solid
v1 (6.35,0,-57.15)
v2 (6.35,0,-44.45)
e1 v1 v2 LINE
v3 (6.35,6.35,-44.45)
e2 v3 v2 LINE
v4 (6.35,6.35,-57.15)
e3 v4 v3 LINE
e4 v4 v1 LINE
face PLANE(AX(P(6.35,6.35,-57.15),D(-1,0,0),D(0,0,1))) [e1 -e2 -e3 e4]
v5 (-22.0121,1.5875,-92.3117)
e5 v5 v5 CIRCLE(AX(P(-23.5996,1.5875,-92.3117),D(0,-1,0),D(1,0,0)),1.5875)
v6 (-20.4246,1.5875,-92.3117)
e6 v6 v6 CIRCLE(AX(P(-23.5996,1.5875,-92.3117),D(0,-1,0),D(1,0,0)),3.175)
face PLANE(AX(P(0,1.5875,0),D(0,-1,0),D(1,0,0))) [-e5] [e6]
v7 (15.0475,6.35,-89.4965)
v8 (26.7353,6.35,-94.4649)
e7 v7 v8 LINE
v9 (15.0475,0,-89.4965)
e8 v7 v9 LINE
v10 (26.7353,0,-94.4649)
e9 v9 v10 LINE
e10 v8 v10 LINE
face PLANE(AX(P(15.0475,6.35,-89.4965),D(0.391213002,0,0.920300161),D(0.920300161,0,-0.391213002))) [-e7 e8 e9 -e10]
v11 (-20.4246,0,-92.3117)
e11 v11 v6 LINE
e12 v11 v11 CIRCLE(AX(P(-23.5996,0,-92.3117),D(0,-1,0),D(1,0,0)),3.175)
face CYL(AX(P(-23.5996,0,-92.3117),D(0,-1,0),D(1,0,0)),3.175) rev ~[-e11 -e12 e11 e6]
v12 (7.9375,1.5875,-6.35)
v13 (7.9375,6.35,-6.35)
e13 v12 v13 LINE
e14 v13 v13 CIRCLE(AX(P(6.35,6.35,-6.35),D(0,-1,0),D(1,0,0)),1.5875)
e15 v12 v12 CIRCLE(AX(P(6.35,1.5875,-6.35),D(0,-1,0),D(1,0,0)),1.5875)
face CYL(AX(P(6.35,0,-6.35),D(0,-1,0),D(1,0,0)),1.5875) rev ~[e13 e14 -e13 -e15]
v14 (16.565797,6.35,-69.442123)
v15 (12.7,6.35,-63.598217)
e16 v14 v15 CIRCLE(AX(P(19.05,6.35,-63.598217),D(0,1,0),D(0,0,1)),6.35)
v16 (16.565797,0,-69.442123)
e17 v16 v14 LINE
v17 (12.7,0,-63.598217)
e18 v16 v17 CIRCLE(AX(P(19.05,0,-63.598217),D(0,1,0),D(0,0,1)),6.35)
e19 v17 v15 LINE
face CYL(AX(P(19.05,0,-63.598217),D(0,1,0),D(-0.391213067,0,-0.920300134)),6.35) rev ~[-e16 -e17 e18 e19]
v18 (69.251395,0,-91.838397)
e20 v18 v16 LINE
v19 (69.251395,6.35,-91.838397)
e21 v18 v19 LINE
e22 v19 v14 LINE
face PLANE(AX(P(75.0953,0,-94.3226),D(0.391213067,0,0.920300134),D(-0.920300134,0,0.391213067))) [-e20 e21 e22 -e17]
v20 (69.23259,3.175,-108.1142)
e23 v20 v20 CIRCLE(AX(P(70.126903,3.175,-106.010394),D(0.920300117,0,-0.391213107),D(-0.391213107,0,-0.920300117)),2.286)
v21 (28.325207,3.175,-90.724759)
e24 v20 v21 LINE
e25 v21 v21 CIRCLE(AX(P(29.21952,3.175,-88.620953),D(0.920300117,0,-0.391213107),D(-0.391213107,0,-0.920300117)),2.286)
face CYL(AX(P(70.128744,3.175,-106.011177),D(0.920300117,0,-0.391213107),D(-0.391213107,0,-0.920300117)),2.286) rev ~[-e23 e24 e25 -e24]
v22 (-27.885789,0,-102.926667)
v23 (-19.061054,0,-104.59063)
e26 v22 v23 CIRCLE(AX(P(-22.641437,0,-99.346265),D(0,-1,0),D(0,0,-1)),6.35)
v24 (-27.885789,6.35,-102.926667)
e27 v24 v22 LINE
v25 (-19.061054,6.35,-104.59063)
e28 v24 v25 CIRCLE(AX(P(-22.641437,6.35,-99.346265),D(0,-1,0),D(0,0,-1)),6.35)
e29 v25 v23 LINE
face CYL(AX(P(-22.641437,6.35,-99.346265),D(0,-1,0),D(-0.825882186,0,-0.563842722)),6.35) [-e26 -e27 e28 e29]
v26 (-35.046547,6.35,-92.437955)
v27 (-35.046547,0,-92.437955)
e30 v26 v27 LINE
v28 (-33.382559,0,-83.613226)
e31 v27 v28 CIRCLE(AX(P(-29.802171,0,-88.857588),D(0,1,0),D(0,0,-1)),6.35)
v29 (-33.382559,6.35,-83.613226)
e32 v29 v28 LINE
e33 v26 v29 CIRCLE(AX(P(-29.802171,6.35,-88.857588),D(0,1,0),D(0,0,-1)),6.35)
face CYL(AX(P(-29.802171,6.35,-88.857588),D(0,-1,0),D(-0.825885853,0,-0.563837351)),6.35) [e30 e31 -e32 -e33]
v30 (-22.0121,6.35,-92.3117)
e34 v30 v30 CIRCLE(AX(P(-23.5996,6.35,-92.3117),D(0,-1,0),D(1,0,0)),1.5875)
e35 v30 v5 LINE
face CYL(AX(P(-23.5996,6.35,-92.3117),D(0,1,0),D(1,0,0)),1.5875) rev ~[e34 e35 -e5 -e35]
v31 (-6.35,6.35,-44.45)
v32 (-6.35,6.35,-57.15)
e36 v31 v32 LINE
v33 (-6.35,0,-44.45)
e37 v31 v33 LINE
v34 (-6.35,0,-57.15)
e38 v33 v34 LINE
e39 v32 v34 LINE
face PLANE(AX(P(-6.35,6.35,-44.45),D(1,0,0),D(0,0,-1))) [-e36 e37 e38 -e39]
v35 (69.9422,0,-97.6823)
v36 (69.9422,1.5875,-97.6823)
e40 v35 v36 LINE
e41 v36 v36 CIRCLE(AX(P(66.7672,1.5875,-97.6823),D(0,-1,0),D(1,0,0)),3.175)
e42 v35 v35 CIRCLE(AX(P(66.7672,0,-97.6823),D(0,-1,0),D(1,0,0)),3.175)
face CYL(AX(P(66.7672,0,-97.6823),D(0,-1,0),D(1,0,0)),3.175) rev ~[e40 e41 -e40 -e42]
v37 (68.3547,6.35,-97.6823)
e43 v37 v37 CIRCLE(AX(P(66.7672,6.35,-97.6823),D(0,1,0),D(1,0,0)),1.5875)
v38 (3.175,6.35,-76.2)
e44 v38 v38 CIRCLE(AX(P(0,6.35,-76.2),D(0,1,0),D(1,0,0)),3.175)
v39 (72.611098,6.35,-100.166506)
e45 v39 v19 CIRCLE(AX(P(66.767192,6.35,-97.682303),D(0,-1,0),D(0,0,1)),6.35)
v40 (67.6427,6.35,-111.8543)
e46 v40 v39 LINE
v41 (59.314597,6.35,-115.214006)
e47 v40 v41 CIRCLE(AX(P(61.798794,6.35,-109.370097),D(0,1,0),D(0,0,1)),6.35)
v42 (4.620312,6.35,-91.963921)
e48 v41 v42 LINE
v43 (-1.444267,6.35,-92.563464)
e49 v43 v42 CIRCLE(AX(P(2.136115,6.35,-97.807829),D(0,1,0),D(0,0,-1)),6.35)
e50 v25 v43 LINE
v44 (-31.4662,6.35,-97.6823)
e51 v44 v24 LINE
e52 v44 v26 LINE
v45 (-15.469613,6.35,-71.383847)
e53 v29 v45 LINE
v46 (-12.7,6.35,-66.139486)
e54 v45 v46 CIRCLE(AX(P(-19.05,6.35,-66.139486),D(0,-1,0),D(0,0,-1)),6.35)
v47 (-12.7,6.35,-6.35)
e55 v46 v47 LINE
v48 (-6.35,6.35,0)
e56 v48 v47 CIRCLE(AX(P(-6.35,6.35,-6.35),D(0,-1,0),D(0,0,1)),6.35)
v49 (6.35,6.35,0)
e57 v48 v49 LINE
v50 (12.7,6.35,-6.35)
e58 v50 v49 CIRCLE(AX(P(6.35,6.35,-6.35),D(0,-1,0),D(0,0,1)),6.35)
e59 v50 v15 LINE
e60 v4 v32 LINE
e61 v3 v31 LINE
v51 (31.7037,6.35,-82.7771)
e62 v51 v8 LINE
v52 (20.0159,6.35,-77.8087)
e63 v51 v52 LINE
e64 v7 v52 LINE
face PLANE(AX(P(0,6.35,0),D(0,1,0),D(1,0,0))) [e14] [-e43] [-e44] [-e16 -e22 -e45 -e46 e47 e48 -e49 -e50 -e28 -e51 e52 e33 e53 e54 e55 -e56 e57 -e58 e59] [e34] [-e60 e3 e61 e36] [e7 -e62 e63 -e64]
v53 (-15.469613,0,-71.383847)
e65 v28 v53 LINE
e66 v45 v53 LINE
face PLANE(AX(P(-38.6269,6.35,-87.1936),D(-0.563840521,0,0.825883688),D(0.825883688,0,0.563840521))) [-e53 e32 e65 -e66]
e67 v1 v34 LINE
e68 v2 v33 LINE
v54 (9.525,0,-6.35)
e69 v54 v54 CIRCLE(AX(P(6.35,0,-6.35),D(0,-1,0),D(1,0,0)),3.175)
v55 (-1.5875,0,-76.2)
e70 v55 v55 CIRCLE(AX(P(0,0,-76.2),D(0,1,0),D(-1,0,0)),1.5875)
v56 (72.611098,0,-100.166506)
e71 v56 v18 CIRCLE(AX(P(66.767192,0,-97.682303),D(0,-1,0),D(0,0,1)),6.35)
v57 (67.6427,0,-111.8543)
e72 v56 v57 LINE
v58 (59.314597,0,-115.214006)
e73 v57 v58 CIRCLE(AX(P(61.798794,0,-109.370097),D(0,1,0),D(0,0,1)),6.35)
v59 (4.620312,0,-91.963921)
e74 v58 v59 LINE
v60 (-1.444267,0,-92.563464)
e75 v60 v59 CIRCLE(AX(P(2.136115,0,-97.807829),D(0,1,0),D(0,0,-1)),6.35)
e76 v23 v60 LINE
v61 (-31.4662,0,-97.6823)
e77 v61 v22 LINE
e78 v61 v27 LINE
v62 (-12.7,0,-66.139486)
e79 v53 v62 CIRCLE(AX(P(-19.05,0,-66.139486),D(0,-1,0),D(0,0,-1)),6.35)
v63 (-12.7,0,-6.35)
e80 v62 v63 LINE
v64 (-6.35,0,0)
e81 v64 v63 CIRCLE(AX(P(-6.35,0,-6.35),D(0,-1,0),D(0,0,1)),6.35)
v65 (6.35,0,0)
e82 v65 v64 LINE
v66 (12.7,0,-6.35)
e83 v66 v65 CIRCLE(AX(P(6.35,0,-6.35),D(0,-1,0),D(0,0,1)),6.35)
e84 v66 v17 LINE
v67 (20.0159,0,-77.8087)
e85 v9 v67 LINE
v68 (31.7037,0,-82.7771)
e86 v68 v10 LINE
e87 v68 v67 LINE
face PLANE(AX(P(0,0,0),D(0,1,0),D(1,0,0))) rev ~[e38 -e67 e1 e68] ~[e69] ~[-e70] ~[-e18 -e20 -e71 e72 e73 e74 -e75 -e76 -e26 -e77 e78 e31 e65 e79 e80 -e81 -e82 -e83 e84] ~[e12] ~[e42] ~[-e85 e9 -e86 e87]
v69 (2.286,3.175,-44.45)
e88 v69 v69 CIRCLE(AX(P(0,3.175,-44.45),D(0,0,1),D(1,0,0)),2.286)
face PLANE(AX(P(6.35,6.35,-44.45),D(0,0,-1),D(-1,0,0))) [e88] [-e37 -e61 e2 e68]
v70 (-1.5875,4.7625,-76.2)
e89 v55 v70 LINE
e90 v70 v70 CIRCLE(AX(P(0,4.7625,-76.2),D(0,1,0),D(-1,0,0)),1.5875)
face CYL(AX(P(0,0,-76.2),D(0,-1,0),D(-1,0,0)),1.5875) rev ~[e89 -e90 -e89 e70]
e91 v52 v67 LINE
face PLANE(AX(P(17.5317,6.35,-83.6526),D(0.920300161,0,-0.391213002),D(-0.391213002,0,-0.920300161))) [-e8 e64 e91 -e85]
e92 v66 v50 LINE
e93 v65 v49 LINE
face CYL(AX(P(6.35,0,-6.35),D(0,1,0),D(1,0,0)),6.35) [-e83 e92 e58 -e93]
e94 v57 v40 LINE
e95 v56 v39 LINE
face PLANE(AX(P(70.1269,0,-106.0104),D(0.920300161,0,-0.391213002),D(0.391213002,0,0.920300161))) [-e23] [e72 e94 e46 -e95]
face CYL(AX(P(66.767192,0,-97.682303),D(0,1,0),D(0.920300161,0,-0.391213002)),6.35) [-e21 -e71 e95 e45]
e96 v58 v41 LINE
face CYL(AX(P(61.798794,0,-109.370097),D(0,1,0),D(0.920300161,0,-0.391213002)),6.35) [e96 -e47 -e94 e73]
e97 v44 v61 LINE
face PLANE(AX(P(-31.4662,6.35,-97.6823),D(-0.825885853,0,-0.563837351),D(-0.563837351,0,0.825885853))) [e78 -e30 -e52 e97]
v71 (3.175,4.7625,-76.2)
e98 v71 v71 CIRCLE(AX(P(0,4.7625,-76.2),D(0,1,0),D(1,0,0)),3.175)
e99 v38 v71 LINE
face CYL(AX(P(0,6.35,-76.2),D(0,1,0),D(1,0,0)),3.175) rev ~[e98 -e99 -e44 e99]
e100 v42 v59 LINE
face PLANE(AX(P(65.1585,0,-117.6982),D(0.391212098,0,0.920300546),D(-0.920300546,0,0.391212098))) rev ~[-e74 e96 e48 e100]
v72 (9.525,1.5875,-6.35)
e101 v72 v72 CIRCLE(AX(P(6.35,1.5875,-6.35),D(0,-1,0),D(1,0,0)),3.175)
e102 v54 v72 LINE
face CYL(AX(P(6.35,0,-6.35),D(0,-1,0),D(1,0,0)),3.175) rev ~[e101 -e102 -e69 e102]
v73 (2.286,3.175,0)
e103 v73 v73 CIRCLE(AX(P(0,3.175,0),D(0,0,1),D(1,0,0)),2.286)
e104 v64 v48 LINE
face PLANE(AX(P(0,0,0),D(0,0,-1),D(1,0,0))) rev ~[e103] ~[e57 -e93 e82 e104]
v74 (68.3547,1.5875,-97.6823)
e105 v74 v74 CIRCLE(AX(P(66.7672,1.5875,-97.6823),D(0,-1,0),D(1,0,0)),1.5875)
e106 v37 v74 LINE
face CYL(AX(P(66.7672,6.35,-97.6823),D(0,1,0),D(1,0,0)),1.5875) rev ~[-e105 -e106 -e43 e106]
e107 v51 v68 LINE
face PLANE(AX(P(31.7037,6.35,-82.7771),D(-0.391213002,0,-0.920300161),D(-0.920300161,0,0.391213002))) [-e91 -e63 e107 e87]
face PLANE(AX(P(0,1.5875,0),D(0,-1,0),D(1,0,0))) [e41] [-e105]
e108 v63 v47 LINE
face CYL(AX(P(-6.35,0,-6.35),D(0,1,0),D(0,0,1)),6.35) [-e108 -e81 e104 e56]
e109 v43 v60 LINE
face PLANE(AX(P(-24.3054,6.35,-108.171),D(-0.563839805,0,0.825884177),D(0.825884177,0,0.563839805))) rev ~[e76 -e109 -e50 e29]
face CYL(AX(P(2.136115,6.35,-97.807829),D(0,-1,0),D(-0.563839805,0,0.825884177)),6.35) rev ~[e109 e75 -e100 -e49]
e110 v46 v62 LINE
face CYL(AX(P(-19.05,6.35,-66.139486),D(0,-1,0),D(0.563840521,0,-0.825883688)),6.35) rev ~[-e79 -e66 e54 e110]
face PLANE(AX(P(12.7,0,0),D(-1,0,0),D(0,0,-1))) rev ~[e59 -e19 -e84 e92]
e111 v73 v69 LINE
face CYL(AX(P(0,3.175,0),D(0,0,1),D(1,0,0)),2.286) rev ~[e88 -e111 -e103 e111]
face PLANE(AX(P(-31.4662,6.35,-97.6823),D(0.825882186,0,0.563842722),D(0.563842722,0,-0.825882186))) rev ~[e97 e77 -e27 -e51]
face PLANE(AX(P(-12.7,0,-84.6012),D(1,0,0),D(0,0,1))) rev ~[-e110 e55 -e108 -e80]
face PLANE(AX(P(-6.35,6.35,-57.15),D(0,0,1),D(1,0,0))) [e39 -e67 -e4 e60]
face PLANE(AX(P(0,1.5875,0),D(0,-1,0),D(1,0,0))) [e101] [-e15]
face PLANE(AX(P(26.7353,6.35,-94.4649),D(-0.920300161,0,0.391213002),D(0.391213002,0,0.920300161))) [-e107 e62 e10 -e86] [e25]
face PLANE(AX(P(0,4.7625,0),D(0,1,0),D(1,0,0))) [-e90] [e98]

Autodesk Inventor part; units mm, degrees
ref_plane "YZ Plane" through (0, 0, 0) normal (1, 0, 0) x (0, 1, 0)
ref_plane "XZ Plane" through (0, 0, 0) normal (0, 1, 0) x (-1, 0, 0)
ref_plane "XY Plane" through (0, 0, 0) normal (0, 0, 1) x (1, 0, 0)
sketch "Sketch1" plane through (0, 0, 0) normal (0, 1, 0) x (-1, 0, 0)
  line L0 (0, -74.6125) -> (0, -76.2)
  line L1 (0, -76.2) -> (-1.461, -76.8211)
  line L2 (-70.1269, -106.0104) -> (-75.0953, -94.3226)
  line L3 (0, 0) -> (-12.7, 0)
  line L4 (0, 0) -> (12.7, 0)
  line L5 (-75.0953, -94.3226) -> (-12.7, -67.7988)
  line L6 (-12.7, 0) -> (-12.7, -67.7988)
  line L7 (-70.1269, -106.0104) -> (-65.1585, -117.6982)
  line L8 (-65.1585, -117.6982) -> (12.7, -84.6012)
  line L9 (12.7, -84.6012) -> (12.7, 0)
  circle A0 centre (0, -76.2) radius 1.5875
  dimension "d0" = 76.2
  dimension "d1" = 76.2
  dimension "d2" = 113.03
  dimension "d3" = 12.7
  dimension "d4" = 12.7
  dimension "d5" = 12.7
  dimension "d6" = 12.7
  dimension "d7" = 3.175
extrude "Extrusion1" add sketch "Sketch1" along normal blind 6.35
sketch "Sketch2" plane through (-12.7, 0, 0) normal (0, 0, 1) x (1, 0, 0)
  circle A0 centre (12.7, 3.175) radius 1.5875
  point P0 (12.7, 0)
  dimension "d10" = 3.175
extrude "Extrusion2" cut sketch "Sketch2" against normal blind 19.05
sketch "Sketch3" plane through (65.1585, 0, -117.6982) normal (0.9203001, 0, -0.3912131) x (-0.3912131, 0, -0.9203001)
  circle A0 centre (-12.7, 3.175) radius 1.5875
  point P0 (-82.8269, 0)
  dimension "d13" = 3.175
extrude "Extrusion3" cut sketch "Sketch3" against normal blind 19.05
fillet "Fillet1" radius 6.35 1 edges at (-12.7, 3.175, -84.6012)
fillet "Fillet2" radius 6.35 1 edges at (12.7, 3.175, -67.7988)
fillet "Fillet3" radius 6.35 1 edges at (65.1585, 3.175, -117.6982)
fillet "Fillet4" radius 6.35 1 edges at (75.0953, 3.175, -94.3226)
fillet "Fillet5" radius 6.35 1 edges at (12.7, 3.175, 0)
fillet "Fillet6" radius 6.35 1 edges at (-12.7, 3.175, 0)
sketch "Sketch4" plane through (0, 6.35, 0) normal (0, 1, 0) x (1, 0, 0)
  circle A0 centre (0, 76.2) radius 1.5875 projected
  circle A1 centre (0, 76.2) radius 3.175
  point P0 (0, 0)
  dimension "d22" = 6.35
extrude "Extrusion4" cut sketch "Sketch4" against normal blind 1.5875
sketch "Sketch5" plane through (0, 6.35, 0) normal (0, 1, 0) x (1, 0, 0)
  arc A0 (69.2514, 91.8384) -> (72.6111, 100.1665) centre (66.7672, 97.6823) ccw projected
  circle A1 centre (66.7672, 97.6823) radius 1.5875
  point P0 (0, 0)
  dimension "d25" = 3.175
extrude "Extrusion5" cut sketch "Sketch5" against normal blind 6.35
sketch "Sketch6" plane through (0, 0, 0) normal (0, -1, 0) x (1, 0, 0)
  circle A0 centre (66.7672, -97.6823) radius 1.5875 projected
  arc A1 (72.6111, -100.1665) -> (69.2514, -91.8384) centre (66.7672, -97.6823) ccw projected
  circle A2 centre (66.7672, -97.6823) radius 3.175
  point P0 (0, 0)
  dimension "d28" = 6.35
extrude "Extrusion6" cut sketch "Sketch6" against normal blind 1.5875
sketch "Sketch7" plane through (0, 0, 0) normal (0, -1, 0) x (1, 0, 0)
  arc A0 (12.7, -6.35) -> (6.35, 0) centre (6.35, -6.35) ccw projected
  circle A1 centre (6.35, -6.35) radius 1.5875
  point P0 (0, 0)
  dimension "d31" = 3.175
extrude "Extrusion7" cut sketch "Sketch7" against normal blind 6.35
sketch "Sketch8" plane through (0, 0, 0) normal (0, -1, 0) x (1, 0, 0)
  circle A0 centre (6.35, -6.35) radius 1.5875 projected
  arc A1 (12.7, -6.35) -> (6.35, 0) centre (6.35, -6.35) ccw projected
  circle A2 centre (6.35, -6.35) radius 3.175
  point P0 (0, 0)
  dimension "d34" = 6.35
extrude "Extrusion8" cut sketch "Sketch8" against normal blind 1.5875
sketch "Sketch9" plane through (0, 3.175, -19.05) normal (0, 0, 1) x (1, 0, 0)
  circle A0 centre (0, 0) radius 1.5875 projected
  point P0 (0, -3.175)
extrude "Extrusion9" cut sketch "Sketch9" against normal blind 31.75
sketch "Sketch10" plane through (52.5952, 3.175, -98.5578) normal (0.9203001, 0, -0.3912131) x (-0.3912131, 0, -0.9203001)
  circle A0 centre (0, 0) radius 1.5875 projected
  point P0 (-70.1269, -3.175)
extrude "Extrusion10" cut sketch "Sketch10" against normal blind 31.75
sketch "Sketch11" plane through (0, 6.35, 0) normal (0, 1, 0) x (1, 0, 0)
  line L0 (-12.7, 80.4006) -> (-12.7, 6.35) projected
  line L1 (0, 57.15) -> (6.35, 57.15)
  line L2 (6.35, 57.15) -> (6.35, 44.45)
  line L3 (6.35, 44.45) -> (-6.35, 44.45)
  line L4 (-6.35, 44.45) -> (-6.35, 57.15)
  line L5 (-6.35, 57.15) -> (0, 57.15)
  point P0 (0, 0)
  dimension "d41" = 6.35
  dimension "d42" = 12.7
  dimension "d43" = 12.7
  dimension "d44" = 12.7
extrude "Extrusion11" cut sketch "Sketch11" against normal blind 31.75
sketch "Sketch12" plane through (0, 6.35, 0) normal (0, 1, 0) x (1, 0, 0)
  line L0 (72.6111, 100.1665) -> (67.6427, 111.8543) projected
  line L1 (59.3146, 115.214) -> (-8.8342, 86.2445) projected
  line L2 (29.2195, 88.621) -> (17.5317, 83.6526)
  line L3 (17.5317, 83.6526) -> (15.0475, 89.4965)
  line L4 (15.0475, 89.4965) -> (26.7353, 94.4649)
  line L5 (26.7353, 94.4649) -> (31.7037, 82.7771)
  line L6 (31.7037, 82.7771) -> (20.0159, 77.8087)
  line L7 (20.0159, 77.8087) -> (17.5317, 83.6526)
  point P0 (0, 0)
  point P1 (70.1269, 106.0104)
  dimension "d47" = 57.15
  dimension "d48" = 6.35
  dimension "d49" = 12.7
  dimension "d50" = 12.7
  dimension "d51" = 12.7
extrude "Extrusion12" cut sketch "Sketch12" against normal blind 31.75 contours L5 L6 L7 L2
sketch "Sketch13" plane through (0, 6.35, 0) normal (0, 1, 0) x (1, 0, 0)
  line L0 (17.5317, 83.6526) -> (29.2195, 88.621) projected
  line L1 (59.3146, 115.214) -> (-8.8342, 86.2445) projected
  line L2 (17.5317, 83.6526) -> (15.0475, 89.4965)
  line L3 (15.0475, 89.4965) -> (26.7353, 94.4649)
  line L4 (26.7353, 94.4649) -> (29.2195, 88.621)
  point P0 (0, 0)
  dimension "d54" = 6.35
  dimension "d55" = 12.7
extrude "Extrusion13" cut sketch "Sketch13" against normal blind 31.75
sketch "Sketch14" plane through (6.35, 0, 0) normal (0, 0, 1) x (1, 0, 0)
  circle A0 centre (-6.35, 3.175) radius 1.5875 projected
  circle A1 centre (-6.35, 3.175) radius 2.286
  point P0 (-6.35, 0)
  dimension "d58" = 4.572
extrude "Extrusion14" cut sketch "Sketch14" against normal blind 44.45
sketch "Sketch15" plane through (67.6427, 0, -111.8543) normal (0.9203001, 0, -0.3912131) x (-0.3912131, 0, -0.9203001)
  circle A0 centre (-6.35, 3.175) radius 1.5875 projected
  circle A1 centre (-6.35, 3.175) radius 2.286
  point P0 (-76.4769, 0)
  dimension "d61" = 4.572
extrude "Extrusion15" cut sketch "Sketch15" against normal blind 44.45
sketch "Sketch16" plane through (0, 6.35, 0) normal (0, 1, 0) x (1, 0, 0)
  circle A0 centre (0, 76.2) radius 3.175 projected
  line L0 (59.3146, 115.214) -> (-8.8342, 86.2445) projected
  arc A1 (-8.8342, 86.2445) -> (-12.7, 80.4006) centre (-6.35, 80.4006) ccw projected
  line L1 (-12.7, 80.4006) -> (-12.7, 6.35) projected
  line L2 (-31.4662, 97.6823) -> (-24.3054, 108.171)
  line L3 (-24.3054, 108.171) -> (1.4241, 90.6052)
  line L4 (-31.4662, 97.6823) -> (-38.6269, 87.1936)
  line L5 (-38.6269, 87.1936) -> (-12.7, 69.493)
  line L6 (0, 76.2) -> (-2.6222, 77.9902)
  point P0 (0, 0)
  dimension "d64" = 38.1
  dimension "d65" = 12.7
  dimension "d66" = 12.7
extrude "Extrusion16" add sketch "Sketch16" against normal blind 6.35 contours L0 A1 L1 L5 L4 L2 L3
sketch "Sketch17" plane through (0, 6.35, 0) normal (0, 1, 0) x (1, 0, 0)
  line L0 (-24.3054, 108.171) -> (-38.6269, 87.1936) projected
  line L1 (-38.6269, 87.1936) -> (-12.7, 69.493) projected
  line L2 (-31.4662, 97.6823) -> (-23.5996, 92.3117)
  circle A0 centre (-23.5996, 92.3117) radius 1.5875
  point P0 (0, 0)
  dimension "d69" = 9.525
  dimension "d70" = 3.175
extrude "Extrusion17" cut sketch "Sketch17" against normal blind 6.35
sketch "Sketch18" plane through (0, 6.35, 0) normal (0, 1, 0) x (1, 0, 0)
  circle A0 centre (-23.5996, 92.3117) radius 1.5875 projected
  line L0 (26.7353, 94.4649) -> (31.7037, 82.7771) projected
  line L1 (31.7037, 82.7771) -> (20.0159, 77.8087) projected
  line L2 (20.0159, 77.8087) -> (15.0475, 89.4965) projected
  line L3 (15.0475, 89.4965) -> (26.7353, 94.4649) projected
  line L4 (-6.35, 44.45) -> (-6.35, 57.15) projected
  line L5 (-6.35, 57.15) -> (6.35, 57.15) projected
  line L6 (6.35, 57.15) -> (6.35, 44.45) projected
  line L7 (6.35, 44.45) -> (-6.35, 44.45) projected
  circle A1 centre (6.35, 6.35) radius 1.5875 projected
  circle A2 centre (66.7672, 97.6823) radius 1.5875 projected
  circle A3 centre (0, 76.2) radius 3.175 projected
  arc A4 (-12.7, 6.35) -> (-6.35, 0) centre (-6.35, 6.35) ccw projected
  line L8 (-6.35, 0) -> (6.35, 0) projected
  arc A5 (6.35, 0) -> (12.7, 6.35) centre (6.35, 6.35) ccw projected
  line L9 (12.7, 6.35) -> (12.7, 63.5983) projected
  arc A6 (16.5658, 69.4422) -> (12.7, 63.5983) centre (19.05, 63.5983) ccw projected
  line L10 (16.5658, 69.4422) -> (69.2514, 91.8384) projected
  arc A7 (69.2514, 91.8384) -> (72.6111, 100.1665) centre (66.7672, 97.6823) ccw projected
  line L11 (72.6111, 100.1665) -> (67.6427, 111.8543) projected
  arc A8 (67.6427, 111.8543) -> (59.3146, 115.214) centre (61.7988, 109.3701) ccw projected
  line L12 (59.3146, 115.214) -> (1.4241, 90.6052) projected
  line L13 (1.4241, 90.6052) -> (-24.3054, 108.171) projected
  line L14 (-24.3054, 108.171) -> (-38.6269, 87.1936) projected
  line L15 (-38.6269, 87.1936) -> (-12.7, 69.493) projected
  line L16 (-12.7, 69.493) -> (-12.7, 6.35) projected
  point P0 (0, 0)
sketch "Sketch19" plane through (0, 0, 0) normal (0, -1, 0) x (1, 0, 0)
  circle A0 centre (-23.5996, -92.3117) radius 1.5875 projected
  circle A1 centre (-23.5996, -92.3117) radius 3.175
  point P0 (0, 0)
  dimension "d73" = 6.35
extrude "Extrusion18" cut sketch "Sketch19" against normal blind 1.5875
fillet "Fillet7" radius 6.35 1 edges at (-24.3054, 3.175, -108.171)
fillet "Fillet8" radius 6.35 1 edges at (-38.6269, 3.175, -87.1936)
fillet "Fillet9" radius 6.35 1 edges at (1.4241, 3.175, -90.6052)
fillet "Fillet10" radius 6.35 1 edges at (-12.7, 3.175, -69.493)
properties part number "Auto Steering Part"
